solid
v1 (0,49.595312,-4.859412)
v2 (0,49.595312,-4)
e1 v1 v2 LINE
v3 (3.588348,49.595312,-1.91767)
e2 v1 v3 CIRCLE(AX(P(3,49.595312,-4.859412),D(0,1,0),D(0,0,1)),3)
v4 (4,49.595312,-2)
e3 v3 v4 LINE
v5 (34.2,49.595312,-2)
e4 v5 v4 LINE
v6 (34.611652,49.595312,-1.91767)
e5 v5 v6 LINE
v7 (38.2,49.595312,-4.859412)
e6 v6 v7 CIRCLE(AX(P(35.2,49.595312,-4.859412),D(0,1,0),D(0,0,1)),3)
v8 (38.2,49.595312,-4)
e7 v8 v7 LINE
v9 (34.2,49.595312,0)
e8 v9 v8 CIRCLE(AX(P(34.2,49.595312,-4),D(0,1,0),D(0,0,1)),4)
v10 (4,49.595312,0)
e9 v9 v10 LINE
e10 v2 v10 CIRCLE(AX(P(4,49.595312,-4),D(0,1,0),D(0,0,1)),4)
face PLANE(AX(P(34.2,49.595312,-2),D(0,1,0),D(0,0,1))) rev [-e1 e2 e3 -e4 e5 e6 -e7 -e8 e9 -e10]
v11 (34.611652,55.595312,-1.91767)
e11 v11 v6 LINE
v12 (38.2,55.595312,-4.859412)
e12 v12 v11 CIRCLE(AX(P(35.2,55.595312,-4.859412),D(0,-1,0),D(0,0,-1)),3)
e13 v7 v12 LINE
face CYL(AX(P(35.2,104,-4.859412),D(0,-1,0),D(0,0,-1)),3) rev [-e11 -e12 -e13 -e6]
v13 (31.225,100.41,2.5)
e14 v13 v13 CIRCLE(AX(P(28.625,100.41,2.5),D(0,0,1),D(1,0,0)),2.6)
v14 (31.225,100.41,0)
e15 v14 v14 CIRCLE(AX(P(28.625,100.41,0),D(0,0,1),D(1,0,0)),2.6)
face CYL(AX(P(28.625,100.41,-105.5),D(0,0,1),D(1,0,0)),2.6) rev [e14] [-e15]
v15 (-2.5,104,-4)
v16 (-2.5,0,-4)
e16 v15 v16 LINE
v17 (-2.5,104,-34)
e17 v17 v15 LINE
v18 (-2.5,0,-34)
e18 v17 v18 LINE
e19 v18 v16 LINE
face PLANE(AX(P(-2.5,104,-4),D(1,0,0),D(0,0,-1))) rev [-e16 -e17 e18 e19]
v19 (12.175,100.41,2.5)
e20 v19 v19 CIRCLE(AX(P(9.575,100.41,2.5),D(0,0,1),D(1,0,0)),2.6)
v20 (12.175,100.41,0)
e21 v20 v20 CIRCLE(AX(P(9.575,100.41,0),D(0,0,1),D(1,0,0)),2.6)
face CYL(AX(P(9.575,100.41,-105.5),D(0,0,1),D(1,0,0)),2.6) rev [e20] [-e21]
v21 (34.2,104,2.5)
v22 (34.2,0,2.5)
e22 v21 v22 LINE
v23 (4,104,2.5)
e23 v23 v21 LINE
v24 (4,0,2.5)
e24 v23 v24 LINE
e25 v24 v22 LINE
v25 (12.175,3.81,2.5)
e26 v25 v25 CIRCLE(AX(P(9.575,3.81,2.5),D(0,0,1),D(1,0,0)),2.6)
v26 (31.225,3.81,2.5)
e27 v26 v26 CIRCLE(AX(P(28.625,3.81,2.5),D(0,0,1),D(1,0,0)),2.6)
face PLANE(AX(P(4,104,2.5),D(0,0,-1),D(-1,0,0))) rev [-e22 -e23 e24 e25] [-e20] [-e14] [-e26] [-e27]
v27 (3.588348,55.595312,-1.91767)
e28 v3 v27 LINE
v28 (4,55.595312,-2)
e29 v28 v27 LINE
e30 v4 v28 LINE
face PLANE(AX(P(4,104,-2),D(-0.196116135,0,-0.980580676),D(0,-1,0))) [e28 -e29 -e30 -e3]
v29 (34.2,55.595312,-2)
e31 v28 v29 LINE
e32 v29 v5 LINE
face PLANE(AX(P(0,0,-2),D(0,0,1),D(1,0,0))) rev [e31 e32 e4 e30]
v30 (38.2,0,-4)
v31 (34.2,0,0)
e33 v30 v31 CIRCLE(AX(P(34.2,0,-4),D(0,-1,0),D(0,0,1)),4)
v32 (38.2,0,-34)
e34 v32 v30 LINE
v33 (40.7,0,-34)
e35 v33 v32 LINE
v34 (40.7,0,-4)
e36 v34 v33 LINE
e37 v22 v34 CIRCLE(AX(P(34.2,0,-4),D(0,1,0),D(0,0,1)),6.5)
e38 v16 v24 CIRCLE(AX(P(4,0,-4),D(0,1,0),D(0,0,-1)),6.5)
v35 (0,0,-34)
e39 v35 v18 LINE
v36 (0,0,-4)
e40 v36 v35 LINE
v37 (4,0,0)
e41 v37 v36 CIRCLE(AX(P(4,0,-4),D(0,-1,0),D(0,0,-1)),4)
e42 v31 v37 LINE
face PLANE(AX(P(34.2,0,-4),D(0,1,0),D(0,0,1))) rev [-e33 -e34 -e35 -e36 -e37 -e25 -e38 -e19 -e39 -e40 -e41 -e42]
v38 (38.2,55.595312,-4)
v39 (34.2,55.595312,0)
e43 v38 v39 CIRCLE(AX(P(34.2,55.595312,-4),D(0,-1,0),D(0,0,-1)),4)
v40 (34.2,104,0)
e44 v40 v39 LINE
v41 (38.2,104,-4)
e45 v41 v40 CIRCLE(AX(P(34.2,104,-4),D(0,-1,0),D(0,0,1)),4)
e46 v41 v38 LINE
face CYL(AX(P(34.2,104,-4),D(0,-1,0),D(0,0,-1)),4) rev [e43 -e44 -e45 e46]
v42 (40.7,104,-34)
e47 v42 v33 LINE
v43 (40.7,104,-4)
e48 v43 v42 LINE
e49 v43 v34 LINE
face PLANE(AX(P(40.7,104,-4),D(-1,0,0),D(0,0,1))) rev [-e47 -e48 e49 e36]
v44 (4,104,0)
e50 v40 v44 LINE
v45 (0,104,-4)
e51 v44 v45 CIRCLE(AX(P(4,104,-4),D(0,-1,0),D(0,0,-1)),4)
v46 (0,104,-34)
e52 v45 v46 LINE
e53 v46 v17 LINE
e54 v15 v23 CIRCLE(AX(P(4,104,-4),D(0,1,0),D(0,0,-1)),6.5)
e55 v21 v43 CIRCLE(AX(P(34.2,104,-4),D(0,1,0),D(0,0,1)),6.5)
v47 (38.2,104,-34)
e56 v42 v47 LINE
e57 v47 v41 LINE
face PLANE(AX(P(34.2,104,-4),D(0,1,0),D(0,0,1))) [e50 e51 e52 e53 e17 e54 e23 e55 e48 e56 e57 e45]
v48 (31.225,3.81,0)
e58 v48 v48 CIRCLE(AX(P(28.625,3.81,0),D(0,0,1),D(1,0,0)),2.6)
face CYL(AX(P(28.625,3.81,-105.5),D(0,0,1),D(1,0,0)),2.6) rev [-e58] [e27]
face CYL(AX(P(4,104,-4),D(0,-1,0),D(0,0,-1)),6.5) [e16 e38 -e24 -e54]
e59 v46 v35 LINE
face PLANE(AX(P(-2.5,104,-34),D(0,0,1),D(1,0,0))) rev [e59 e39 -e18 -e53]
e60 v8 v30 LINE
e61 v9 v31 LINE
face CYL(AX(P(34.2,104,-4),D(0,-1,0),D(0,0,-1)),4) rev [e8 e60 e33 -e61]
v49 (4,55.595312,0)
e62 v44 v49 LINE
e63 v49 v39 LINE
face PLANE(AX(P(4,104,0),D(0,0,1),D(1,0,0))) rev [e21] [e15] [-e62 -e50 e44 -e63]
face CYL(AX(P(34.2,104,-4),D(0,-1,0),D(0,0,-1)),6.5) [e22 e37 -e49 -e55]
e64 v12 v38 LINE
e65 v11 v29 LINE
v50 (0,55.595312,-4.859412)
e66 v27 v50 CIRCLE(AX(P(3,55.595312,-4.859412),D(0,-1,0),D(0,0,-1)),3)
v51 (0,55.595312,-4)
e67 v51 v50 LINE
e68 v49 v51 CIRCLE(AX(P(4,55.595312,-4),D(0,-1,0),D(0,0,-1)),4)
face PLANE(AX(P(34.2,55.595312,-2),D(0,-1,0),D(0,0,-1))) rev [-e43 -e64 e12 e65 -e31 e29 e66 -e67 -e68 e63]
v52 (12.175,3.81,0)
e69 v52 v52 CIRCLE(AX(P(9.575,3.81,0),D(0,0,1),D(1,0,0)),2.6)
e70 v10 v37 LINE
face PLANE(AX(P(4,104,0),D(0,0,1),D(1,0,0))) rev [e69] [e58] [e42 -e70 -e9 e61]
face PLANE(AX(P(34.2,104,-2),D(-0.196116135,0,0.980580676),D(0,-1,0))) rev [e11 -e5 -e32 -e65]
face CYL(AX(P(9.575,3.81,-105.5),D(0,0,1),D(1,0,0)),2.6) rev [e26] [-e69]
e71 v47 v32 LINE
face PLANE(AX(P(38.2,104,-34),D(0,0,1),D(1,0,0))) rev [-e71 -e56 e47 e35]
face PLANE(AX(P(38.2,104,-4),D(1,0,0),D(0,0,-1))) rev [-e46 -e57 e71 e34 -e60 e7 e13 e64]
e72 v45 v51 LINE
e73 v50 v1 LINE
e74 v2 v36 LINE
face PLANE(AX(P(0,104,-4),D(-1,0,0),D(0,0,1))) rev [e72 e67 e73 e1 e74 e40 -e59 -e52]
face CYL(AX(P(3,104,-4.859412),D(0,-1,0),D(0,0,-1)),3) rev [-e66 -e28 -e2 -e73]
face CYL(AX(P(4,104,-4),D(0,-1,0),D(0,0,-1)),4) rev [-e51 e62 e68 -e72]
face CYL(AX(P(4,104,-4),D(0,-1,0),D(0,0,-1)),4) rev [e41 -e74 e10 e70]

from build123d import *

# Parameters (mm, degrees)
BOSS_EXTRUDE1_DEPTH = 104
SKETCH2_R           = 2.6
CUT_EXTRUDE1_DEPTH  = 108
SKETCH3_W           = 30.2
SKETCH3_H           = 6
BOSS_EXTRUDE2_DEPTH = 2
CHAMFER1_SIZE       = 2
FILLET1_R           = 3


with BuildPart() as part:
    # Sketch1 → Boss-Extrude1 (new body)
    with BuildSketch(Plane(origin=(0, 0, 0), x_dir=(1, 0, 0), z_dir=(0, 1, 0))):
        with BuildLine():
            Line((4, 0), (34.2, 0))
            ThreePointArc((34.2, 0), (37.028427125, 1.171572875), (38.2, 4))
            Line((38.2, 4), (38.2, 34))
            Line((38.2, 34), (40.7, 34))
            Line((40.7, 34), (40.7, 4))
            ThreePointArc((40.7, 4), (38.796194078, -0.596194078), (34.2, -2.5))
            Line((34.2, -2.5), (4, -2.5))
            ThreePointArc((4, -2.5), (-0.596194078, -0.596194078), (-2.5, 4))
            Line((-2.5, 4), (-2.5, 34))
            Line((-2.5, 34), (0, 34))
            Line((0, 34), (0, 4))
            ThreePointArc((0, 4), (1.171572875, 1.171572875), (4, 0))
        make_face()
    extrude(amount=BOSS_EXTRUDE1_DEPTH)

    # Sketch2 → Cut-Extrude1 (cut)
    with BuildSketch(Plane.XY.offset(2.5)):
        with Locations((9.575, 3.81)):
            Circle(SKETCH2_R)
        with Locations((28.625, 3.81)):
            Circle(SKETCH2_R)
        with Locations((9.575, 100.41)):
            Circle(SKETCH2_R)
        with Locations((28.625, 100.41)):
            Circle(SKETCH2_R)
    extrude(amount=-CUT_EXTRUDE1_DEPTH, mode=Mode.SUBTRACT)

    # Sketch3 → Boss-Extrude2 (add)
    with BuildSketch(Plane(origin=(0, 0, 0), x_dir=(-1, 0, 0), z_dir=(0, 0, -1))):
        with Locations((-19.1, 52.595312466)):
            Rectangle(SKETCH3_W, SKETCH3_H)
    extrude(amount=BOSS_EXTRUDE2_DEPTH)

    # Chamfer1
    # the kernel refuses this chamfer: 10, 2 mm, written as the material it adds along each edge
    with BuildSketch(Plane(origin=(34.2, 55.595312466, 0), x_dir=(0.908761807760111, 0, -0.41731520072551287), z_dir=(0, -1, 0))) as chamfer1_piece_1_section:
        with BuildLine():
            Line((3.338521606, 0), (CHAMFER1_SIZE * 0.417315200726, -CHAMFER1_SIZE * 0.90876180776))
            Line((CHAMFER1_SIZE * 0.417315200726, -CHAMFER1_SIZE * 0.90876180776), (0, 0))
            ThreePointArc((0, 0), (1.841628656, 0.361237209), (3.338521606, 0))
        make_face()
    chamfer1_piece_1 = extrude(amount=6, mode=Mode.PRIVATE)
    chamfer1_piece_1 = split(chamfer1_piece_1, bisect_by=Plane(origin=(34.2, 55.595312466, -2), z_dir=(0, 0, 1)), keep=Keep.TOP, mode=Mode.PRIVATE)
    add(chamfer1_piece_1)
    with BuildSketch(Plane(origin=(4, 49.595312466, 0), x_dir=(-0.9087618077601108, 0, -0.41731520072551315), z_dir=(0, 1, 0))) as chamfer1_piece_2_section:
        with BuildLine():
            Line((3.338521606, 0), (CHAMFER1_SIZE * 0.417315200726, -CHAMFER1_SIZE * 0.90876180776))
            Line((CHAMFER1_SIZE * 0.417315200726, -CHAMFER1_SIZE * 0.90876180776), (0, 0))
            ThreePointArc((0, 0), (1.841628656, 0.361237209), (3.338521606, 0))
        make_face()
    chamfer1_piece_2 = extrude(amount=6, mode=Mode.PRIVATE)
    chamfer1_piece_2 = split(chamfer1_piece_2, bisect_by=Plane(origin=(4, 49.595312466, -2), z_dir=(0, 0, 1)), keep=Keep.TOP, mode=Mode.PRIVATE)
    add(chamfer1_piece_2)

    # Fillet1
    # the kernel refuses this fillet: 3 mm, written as the material it adds along each edge
    with BuildSketch(Plane(origin=(37.23392093, 55.595312466, -1.393215814), x_dir=(-0.9805806756909838, 0, -0.1961161351378653), z_dir=(0, -1, 0)), Plane(origin=(0.96607907, 49.595312466, -1.393215814), x_dir=(0.9805806756909838, 0, -0.19611613513786538), z_dir=(0, 1, 0))) as fillet1_piece_1:
        with BuildLine():
            CenterArc((2.674200502, 3), FILLET1_R, 168.690067526, 101.309932474)
            Line((-0.267541525, 3.588348405), (-0.561715728, 3.647183246))
            ThreePointArc((-0.561715728, 3.647183246), (-0.730260231, 2.804460732), (-0.261467751, -0.147087101))
            Line((-0.261467751, -0.147087101), (0, -0.3))
            Line((0, -0.3), (2.674200502, -0.3))
            Line((2.674200502, -0.3), (2.674200502, 0))
        make_face()
    extrude(amount=6)


solid = part.part
